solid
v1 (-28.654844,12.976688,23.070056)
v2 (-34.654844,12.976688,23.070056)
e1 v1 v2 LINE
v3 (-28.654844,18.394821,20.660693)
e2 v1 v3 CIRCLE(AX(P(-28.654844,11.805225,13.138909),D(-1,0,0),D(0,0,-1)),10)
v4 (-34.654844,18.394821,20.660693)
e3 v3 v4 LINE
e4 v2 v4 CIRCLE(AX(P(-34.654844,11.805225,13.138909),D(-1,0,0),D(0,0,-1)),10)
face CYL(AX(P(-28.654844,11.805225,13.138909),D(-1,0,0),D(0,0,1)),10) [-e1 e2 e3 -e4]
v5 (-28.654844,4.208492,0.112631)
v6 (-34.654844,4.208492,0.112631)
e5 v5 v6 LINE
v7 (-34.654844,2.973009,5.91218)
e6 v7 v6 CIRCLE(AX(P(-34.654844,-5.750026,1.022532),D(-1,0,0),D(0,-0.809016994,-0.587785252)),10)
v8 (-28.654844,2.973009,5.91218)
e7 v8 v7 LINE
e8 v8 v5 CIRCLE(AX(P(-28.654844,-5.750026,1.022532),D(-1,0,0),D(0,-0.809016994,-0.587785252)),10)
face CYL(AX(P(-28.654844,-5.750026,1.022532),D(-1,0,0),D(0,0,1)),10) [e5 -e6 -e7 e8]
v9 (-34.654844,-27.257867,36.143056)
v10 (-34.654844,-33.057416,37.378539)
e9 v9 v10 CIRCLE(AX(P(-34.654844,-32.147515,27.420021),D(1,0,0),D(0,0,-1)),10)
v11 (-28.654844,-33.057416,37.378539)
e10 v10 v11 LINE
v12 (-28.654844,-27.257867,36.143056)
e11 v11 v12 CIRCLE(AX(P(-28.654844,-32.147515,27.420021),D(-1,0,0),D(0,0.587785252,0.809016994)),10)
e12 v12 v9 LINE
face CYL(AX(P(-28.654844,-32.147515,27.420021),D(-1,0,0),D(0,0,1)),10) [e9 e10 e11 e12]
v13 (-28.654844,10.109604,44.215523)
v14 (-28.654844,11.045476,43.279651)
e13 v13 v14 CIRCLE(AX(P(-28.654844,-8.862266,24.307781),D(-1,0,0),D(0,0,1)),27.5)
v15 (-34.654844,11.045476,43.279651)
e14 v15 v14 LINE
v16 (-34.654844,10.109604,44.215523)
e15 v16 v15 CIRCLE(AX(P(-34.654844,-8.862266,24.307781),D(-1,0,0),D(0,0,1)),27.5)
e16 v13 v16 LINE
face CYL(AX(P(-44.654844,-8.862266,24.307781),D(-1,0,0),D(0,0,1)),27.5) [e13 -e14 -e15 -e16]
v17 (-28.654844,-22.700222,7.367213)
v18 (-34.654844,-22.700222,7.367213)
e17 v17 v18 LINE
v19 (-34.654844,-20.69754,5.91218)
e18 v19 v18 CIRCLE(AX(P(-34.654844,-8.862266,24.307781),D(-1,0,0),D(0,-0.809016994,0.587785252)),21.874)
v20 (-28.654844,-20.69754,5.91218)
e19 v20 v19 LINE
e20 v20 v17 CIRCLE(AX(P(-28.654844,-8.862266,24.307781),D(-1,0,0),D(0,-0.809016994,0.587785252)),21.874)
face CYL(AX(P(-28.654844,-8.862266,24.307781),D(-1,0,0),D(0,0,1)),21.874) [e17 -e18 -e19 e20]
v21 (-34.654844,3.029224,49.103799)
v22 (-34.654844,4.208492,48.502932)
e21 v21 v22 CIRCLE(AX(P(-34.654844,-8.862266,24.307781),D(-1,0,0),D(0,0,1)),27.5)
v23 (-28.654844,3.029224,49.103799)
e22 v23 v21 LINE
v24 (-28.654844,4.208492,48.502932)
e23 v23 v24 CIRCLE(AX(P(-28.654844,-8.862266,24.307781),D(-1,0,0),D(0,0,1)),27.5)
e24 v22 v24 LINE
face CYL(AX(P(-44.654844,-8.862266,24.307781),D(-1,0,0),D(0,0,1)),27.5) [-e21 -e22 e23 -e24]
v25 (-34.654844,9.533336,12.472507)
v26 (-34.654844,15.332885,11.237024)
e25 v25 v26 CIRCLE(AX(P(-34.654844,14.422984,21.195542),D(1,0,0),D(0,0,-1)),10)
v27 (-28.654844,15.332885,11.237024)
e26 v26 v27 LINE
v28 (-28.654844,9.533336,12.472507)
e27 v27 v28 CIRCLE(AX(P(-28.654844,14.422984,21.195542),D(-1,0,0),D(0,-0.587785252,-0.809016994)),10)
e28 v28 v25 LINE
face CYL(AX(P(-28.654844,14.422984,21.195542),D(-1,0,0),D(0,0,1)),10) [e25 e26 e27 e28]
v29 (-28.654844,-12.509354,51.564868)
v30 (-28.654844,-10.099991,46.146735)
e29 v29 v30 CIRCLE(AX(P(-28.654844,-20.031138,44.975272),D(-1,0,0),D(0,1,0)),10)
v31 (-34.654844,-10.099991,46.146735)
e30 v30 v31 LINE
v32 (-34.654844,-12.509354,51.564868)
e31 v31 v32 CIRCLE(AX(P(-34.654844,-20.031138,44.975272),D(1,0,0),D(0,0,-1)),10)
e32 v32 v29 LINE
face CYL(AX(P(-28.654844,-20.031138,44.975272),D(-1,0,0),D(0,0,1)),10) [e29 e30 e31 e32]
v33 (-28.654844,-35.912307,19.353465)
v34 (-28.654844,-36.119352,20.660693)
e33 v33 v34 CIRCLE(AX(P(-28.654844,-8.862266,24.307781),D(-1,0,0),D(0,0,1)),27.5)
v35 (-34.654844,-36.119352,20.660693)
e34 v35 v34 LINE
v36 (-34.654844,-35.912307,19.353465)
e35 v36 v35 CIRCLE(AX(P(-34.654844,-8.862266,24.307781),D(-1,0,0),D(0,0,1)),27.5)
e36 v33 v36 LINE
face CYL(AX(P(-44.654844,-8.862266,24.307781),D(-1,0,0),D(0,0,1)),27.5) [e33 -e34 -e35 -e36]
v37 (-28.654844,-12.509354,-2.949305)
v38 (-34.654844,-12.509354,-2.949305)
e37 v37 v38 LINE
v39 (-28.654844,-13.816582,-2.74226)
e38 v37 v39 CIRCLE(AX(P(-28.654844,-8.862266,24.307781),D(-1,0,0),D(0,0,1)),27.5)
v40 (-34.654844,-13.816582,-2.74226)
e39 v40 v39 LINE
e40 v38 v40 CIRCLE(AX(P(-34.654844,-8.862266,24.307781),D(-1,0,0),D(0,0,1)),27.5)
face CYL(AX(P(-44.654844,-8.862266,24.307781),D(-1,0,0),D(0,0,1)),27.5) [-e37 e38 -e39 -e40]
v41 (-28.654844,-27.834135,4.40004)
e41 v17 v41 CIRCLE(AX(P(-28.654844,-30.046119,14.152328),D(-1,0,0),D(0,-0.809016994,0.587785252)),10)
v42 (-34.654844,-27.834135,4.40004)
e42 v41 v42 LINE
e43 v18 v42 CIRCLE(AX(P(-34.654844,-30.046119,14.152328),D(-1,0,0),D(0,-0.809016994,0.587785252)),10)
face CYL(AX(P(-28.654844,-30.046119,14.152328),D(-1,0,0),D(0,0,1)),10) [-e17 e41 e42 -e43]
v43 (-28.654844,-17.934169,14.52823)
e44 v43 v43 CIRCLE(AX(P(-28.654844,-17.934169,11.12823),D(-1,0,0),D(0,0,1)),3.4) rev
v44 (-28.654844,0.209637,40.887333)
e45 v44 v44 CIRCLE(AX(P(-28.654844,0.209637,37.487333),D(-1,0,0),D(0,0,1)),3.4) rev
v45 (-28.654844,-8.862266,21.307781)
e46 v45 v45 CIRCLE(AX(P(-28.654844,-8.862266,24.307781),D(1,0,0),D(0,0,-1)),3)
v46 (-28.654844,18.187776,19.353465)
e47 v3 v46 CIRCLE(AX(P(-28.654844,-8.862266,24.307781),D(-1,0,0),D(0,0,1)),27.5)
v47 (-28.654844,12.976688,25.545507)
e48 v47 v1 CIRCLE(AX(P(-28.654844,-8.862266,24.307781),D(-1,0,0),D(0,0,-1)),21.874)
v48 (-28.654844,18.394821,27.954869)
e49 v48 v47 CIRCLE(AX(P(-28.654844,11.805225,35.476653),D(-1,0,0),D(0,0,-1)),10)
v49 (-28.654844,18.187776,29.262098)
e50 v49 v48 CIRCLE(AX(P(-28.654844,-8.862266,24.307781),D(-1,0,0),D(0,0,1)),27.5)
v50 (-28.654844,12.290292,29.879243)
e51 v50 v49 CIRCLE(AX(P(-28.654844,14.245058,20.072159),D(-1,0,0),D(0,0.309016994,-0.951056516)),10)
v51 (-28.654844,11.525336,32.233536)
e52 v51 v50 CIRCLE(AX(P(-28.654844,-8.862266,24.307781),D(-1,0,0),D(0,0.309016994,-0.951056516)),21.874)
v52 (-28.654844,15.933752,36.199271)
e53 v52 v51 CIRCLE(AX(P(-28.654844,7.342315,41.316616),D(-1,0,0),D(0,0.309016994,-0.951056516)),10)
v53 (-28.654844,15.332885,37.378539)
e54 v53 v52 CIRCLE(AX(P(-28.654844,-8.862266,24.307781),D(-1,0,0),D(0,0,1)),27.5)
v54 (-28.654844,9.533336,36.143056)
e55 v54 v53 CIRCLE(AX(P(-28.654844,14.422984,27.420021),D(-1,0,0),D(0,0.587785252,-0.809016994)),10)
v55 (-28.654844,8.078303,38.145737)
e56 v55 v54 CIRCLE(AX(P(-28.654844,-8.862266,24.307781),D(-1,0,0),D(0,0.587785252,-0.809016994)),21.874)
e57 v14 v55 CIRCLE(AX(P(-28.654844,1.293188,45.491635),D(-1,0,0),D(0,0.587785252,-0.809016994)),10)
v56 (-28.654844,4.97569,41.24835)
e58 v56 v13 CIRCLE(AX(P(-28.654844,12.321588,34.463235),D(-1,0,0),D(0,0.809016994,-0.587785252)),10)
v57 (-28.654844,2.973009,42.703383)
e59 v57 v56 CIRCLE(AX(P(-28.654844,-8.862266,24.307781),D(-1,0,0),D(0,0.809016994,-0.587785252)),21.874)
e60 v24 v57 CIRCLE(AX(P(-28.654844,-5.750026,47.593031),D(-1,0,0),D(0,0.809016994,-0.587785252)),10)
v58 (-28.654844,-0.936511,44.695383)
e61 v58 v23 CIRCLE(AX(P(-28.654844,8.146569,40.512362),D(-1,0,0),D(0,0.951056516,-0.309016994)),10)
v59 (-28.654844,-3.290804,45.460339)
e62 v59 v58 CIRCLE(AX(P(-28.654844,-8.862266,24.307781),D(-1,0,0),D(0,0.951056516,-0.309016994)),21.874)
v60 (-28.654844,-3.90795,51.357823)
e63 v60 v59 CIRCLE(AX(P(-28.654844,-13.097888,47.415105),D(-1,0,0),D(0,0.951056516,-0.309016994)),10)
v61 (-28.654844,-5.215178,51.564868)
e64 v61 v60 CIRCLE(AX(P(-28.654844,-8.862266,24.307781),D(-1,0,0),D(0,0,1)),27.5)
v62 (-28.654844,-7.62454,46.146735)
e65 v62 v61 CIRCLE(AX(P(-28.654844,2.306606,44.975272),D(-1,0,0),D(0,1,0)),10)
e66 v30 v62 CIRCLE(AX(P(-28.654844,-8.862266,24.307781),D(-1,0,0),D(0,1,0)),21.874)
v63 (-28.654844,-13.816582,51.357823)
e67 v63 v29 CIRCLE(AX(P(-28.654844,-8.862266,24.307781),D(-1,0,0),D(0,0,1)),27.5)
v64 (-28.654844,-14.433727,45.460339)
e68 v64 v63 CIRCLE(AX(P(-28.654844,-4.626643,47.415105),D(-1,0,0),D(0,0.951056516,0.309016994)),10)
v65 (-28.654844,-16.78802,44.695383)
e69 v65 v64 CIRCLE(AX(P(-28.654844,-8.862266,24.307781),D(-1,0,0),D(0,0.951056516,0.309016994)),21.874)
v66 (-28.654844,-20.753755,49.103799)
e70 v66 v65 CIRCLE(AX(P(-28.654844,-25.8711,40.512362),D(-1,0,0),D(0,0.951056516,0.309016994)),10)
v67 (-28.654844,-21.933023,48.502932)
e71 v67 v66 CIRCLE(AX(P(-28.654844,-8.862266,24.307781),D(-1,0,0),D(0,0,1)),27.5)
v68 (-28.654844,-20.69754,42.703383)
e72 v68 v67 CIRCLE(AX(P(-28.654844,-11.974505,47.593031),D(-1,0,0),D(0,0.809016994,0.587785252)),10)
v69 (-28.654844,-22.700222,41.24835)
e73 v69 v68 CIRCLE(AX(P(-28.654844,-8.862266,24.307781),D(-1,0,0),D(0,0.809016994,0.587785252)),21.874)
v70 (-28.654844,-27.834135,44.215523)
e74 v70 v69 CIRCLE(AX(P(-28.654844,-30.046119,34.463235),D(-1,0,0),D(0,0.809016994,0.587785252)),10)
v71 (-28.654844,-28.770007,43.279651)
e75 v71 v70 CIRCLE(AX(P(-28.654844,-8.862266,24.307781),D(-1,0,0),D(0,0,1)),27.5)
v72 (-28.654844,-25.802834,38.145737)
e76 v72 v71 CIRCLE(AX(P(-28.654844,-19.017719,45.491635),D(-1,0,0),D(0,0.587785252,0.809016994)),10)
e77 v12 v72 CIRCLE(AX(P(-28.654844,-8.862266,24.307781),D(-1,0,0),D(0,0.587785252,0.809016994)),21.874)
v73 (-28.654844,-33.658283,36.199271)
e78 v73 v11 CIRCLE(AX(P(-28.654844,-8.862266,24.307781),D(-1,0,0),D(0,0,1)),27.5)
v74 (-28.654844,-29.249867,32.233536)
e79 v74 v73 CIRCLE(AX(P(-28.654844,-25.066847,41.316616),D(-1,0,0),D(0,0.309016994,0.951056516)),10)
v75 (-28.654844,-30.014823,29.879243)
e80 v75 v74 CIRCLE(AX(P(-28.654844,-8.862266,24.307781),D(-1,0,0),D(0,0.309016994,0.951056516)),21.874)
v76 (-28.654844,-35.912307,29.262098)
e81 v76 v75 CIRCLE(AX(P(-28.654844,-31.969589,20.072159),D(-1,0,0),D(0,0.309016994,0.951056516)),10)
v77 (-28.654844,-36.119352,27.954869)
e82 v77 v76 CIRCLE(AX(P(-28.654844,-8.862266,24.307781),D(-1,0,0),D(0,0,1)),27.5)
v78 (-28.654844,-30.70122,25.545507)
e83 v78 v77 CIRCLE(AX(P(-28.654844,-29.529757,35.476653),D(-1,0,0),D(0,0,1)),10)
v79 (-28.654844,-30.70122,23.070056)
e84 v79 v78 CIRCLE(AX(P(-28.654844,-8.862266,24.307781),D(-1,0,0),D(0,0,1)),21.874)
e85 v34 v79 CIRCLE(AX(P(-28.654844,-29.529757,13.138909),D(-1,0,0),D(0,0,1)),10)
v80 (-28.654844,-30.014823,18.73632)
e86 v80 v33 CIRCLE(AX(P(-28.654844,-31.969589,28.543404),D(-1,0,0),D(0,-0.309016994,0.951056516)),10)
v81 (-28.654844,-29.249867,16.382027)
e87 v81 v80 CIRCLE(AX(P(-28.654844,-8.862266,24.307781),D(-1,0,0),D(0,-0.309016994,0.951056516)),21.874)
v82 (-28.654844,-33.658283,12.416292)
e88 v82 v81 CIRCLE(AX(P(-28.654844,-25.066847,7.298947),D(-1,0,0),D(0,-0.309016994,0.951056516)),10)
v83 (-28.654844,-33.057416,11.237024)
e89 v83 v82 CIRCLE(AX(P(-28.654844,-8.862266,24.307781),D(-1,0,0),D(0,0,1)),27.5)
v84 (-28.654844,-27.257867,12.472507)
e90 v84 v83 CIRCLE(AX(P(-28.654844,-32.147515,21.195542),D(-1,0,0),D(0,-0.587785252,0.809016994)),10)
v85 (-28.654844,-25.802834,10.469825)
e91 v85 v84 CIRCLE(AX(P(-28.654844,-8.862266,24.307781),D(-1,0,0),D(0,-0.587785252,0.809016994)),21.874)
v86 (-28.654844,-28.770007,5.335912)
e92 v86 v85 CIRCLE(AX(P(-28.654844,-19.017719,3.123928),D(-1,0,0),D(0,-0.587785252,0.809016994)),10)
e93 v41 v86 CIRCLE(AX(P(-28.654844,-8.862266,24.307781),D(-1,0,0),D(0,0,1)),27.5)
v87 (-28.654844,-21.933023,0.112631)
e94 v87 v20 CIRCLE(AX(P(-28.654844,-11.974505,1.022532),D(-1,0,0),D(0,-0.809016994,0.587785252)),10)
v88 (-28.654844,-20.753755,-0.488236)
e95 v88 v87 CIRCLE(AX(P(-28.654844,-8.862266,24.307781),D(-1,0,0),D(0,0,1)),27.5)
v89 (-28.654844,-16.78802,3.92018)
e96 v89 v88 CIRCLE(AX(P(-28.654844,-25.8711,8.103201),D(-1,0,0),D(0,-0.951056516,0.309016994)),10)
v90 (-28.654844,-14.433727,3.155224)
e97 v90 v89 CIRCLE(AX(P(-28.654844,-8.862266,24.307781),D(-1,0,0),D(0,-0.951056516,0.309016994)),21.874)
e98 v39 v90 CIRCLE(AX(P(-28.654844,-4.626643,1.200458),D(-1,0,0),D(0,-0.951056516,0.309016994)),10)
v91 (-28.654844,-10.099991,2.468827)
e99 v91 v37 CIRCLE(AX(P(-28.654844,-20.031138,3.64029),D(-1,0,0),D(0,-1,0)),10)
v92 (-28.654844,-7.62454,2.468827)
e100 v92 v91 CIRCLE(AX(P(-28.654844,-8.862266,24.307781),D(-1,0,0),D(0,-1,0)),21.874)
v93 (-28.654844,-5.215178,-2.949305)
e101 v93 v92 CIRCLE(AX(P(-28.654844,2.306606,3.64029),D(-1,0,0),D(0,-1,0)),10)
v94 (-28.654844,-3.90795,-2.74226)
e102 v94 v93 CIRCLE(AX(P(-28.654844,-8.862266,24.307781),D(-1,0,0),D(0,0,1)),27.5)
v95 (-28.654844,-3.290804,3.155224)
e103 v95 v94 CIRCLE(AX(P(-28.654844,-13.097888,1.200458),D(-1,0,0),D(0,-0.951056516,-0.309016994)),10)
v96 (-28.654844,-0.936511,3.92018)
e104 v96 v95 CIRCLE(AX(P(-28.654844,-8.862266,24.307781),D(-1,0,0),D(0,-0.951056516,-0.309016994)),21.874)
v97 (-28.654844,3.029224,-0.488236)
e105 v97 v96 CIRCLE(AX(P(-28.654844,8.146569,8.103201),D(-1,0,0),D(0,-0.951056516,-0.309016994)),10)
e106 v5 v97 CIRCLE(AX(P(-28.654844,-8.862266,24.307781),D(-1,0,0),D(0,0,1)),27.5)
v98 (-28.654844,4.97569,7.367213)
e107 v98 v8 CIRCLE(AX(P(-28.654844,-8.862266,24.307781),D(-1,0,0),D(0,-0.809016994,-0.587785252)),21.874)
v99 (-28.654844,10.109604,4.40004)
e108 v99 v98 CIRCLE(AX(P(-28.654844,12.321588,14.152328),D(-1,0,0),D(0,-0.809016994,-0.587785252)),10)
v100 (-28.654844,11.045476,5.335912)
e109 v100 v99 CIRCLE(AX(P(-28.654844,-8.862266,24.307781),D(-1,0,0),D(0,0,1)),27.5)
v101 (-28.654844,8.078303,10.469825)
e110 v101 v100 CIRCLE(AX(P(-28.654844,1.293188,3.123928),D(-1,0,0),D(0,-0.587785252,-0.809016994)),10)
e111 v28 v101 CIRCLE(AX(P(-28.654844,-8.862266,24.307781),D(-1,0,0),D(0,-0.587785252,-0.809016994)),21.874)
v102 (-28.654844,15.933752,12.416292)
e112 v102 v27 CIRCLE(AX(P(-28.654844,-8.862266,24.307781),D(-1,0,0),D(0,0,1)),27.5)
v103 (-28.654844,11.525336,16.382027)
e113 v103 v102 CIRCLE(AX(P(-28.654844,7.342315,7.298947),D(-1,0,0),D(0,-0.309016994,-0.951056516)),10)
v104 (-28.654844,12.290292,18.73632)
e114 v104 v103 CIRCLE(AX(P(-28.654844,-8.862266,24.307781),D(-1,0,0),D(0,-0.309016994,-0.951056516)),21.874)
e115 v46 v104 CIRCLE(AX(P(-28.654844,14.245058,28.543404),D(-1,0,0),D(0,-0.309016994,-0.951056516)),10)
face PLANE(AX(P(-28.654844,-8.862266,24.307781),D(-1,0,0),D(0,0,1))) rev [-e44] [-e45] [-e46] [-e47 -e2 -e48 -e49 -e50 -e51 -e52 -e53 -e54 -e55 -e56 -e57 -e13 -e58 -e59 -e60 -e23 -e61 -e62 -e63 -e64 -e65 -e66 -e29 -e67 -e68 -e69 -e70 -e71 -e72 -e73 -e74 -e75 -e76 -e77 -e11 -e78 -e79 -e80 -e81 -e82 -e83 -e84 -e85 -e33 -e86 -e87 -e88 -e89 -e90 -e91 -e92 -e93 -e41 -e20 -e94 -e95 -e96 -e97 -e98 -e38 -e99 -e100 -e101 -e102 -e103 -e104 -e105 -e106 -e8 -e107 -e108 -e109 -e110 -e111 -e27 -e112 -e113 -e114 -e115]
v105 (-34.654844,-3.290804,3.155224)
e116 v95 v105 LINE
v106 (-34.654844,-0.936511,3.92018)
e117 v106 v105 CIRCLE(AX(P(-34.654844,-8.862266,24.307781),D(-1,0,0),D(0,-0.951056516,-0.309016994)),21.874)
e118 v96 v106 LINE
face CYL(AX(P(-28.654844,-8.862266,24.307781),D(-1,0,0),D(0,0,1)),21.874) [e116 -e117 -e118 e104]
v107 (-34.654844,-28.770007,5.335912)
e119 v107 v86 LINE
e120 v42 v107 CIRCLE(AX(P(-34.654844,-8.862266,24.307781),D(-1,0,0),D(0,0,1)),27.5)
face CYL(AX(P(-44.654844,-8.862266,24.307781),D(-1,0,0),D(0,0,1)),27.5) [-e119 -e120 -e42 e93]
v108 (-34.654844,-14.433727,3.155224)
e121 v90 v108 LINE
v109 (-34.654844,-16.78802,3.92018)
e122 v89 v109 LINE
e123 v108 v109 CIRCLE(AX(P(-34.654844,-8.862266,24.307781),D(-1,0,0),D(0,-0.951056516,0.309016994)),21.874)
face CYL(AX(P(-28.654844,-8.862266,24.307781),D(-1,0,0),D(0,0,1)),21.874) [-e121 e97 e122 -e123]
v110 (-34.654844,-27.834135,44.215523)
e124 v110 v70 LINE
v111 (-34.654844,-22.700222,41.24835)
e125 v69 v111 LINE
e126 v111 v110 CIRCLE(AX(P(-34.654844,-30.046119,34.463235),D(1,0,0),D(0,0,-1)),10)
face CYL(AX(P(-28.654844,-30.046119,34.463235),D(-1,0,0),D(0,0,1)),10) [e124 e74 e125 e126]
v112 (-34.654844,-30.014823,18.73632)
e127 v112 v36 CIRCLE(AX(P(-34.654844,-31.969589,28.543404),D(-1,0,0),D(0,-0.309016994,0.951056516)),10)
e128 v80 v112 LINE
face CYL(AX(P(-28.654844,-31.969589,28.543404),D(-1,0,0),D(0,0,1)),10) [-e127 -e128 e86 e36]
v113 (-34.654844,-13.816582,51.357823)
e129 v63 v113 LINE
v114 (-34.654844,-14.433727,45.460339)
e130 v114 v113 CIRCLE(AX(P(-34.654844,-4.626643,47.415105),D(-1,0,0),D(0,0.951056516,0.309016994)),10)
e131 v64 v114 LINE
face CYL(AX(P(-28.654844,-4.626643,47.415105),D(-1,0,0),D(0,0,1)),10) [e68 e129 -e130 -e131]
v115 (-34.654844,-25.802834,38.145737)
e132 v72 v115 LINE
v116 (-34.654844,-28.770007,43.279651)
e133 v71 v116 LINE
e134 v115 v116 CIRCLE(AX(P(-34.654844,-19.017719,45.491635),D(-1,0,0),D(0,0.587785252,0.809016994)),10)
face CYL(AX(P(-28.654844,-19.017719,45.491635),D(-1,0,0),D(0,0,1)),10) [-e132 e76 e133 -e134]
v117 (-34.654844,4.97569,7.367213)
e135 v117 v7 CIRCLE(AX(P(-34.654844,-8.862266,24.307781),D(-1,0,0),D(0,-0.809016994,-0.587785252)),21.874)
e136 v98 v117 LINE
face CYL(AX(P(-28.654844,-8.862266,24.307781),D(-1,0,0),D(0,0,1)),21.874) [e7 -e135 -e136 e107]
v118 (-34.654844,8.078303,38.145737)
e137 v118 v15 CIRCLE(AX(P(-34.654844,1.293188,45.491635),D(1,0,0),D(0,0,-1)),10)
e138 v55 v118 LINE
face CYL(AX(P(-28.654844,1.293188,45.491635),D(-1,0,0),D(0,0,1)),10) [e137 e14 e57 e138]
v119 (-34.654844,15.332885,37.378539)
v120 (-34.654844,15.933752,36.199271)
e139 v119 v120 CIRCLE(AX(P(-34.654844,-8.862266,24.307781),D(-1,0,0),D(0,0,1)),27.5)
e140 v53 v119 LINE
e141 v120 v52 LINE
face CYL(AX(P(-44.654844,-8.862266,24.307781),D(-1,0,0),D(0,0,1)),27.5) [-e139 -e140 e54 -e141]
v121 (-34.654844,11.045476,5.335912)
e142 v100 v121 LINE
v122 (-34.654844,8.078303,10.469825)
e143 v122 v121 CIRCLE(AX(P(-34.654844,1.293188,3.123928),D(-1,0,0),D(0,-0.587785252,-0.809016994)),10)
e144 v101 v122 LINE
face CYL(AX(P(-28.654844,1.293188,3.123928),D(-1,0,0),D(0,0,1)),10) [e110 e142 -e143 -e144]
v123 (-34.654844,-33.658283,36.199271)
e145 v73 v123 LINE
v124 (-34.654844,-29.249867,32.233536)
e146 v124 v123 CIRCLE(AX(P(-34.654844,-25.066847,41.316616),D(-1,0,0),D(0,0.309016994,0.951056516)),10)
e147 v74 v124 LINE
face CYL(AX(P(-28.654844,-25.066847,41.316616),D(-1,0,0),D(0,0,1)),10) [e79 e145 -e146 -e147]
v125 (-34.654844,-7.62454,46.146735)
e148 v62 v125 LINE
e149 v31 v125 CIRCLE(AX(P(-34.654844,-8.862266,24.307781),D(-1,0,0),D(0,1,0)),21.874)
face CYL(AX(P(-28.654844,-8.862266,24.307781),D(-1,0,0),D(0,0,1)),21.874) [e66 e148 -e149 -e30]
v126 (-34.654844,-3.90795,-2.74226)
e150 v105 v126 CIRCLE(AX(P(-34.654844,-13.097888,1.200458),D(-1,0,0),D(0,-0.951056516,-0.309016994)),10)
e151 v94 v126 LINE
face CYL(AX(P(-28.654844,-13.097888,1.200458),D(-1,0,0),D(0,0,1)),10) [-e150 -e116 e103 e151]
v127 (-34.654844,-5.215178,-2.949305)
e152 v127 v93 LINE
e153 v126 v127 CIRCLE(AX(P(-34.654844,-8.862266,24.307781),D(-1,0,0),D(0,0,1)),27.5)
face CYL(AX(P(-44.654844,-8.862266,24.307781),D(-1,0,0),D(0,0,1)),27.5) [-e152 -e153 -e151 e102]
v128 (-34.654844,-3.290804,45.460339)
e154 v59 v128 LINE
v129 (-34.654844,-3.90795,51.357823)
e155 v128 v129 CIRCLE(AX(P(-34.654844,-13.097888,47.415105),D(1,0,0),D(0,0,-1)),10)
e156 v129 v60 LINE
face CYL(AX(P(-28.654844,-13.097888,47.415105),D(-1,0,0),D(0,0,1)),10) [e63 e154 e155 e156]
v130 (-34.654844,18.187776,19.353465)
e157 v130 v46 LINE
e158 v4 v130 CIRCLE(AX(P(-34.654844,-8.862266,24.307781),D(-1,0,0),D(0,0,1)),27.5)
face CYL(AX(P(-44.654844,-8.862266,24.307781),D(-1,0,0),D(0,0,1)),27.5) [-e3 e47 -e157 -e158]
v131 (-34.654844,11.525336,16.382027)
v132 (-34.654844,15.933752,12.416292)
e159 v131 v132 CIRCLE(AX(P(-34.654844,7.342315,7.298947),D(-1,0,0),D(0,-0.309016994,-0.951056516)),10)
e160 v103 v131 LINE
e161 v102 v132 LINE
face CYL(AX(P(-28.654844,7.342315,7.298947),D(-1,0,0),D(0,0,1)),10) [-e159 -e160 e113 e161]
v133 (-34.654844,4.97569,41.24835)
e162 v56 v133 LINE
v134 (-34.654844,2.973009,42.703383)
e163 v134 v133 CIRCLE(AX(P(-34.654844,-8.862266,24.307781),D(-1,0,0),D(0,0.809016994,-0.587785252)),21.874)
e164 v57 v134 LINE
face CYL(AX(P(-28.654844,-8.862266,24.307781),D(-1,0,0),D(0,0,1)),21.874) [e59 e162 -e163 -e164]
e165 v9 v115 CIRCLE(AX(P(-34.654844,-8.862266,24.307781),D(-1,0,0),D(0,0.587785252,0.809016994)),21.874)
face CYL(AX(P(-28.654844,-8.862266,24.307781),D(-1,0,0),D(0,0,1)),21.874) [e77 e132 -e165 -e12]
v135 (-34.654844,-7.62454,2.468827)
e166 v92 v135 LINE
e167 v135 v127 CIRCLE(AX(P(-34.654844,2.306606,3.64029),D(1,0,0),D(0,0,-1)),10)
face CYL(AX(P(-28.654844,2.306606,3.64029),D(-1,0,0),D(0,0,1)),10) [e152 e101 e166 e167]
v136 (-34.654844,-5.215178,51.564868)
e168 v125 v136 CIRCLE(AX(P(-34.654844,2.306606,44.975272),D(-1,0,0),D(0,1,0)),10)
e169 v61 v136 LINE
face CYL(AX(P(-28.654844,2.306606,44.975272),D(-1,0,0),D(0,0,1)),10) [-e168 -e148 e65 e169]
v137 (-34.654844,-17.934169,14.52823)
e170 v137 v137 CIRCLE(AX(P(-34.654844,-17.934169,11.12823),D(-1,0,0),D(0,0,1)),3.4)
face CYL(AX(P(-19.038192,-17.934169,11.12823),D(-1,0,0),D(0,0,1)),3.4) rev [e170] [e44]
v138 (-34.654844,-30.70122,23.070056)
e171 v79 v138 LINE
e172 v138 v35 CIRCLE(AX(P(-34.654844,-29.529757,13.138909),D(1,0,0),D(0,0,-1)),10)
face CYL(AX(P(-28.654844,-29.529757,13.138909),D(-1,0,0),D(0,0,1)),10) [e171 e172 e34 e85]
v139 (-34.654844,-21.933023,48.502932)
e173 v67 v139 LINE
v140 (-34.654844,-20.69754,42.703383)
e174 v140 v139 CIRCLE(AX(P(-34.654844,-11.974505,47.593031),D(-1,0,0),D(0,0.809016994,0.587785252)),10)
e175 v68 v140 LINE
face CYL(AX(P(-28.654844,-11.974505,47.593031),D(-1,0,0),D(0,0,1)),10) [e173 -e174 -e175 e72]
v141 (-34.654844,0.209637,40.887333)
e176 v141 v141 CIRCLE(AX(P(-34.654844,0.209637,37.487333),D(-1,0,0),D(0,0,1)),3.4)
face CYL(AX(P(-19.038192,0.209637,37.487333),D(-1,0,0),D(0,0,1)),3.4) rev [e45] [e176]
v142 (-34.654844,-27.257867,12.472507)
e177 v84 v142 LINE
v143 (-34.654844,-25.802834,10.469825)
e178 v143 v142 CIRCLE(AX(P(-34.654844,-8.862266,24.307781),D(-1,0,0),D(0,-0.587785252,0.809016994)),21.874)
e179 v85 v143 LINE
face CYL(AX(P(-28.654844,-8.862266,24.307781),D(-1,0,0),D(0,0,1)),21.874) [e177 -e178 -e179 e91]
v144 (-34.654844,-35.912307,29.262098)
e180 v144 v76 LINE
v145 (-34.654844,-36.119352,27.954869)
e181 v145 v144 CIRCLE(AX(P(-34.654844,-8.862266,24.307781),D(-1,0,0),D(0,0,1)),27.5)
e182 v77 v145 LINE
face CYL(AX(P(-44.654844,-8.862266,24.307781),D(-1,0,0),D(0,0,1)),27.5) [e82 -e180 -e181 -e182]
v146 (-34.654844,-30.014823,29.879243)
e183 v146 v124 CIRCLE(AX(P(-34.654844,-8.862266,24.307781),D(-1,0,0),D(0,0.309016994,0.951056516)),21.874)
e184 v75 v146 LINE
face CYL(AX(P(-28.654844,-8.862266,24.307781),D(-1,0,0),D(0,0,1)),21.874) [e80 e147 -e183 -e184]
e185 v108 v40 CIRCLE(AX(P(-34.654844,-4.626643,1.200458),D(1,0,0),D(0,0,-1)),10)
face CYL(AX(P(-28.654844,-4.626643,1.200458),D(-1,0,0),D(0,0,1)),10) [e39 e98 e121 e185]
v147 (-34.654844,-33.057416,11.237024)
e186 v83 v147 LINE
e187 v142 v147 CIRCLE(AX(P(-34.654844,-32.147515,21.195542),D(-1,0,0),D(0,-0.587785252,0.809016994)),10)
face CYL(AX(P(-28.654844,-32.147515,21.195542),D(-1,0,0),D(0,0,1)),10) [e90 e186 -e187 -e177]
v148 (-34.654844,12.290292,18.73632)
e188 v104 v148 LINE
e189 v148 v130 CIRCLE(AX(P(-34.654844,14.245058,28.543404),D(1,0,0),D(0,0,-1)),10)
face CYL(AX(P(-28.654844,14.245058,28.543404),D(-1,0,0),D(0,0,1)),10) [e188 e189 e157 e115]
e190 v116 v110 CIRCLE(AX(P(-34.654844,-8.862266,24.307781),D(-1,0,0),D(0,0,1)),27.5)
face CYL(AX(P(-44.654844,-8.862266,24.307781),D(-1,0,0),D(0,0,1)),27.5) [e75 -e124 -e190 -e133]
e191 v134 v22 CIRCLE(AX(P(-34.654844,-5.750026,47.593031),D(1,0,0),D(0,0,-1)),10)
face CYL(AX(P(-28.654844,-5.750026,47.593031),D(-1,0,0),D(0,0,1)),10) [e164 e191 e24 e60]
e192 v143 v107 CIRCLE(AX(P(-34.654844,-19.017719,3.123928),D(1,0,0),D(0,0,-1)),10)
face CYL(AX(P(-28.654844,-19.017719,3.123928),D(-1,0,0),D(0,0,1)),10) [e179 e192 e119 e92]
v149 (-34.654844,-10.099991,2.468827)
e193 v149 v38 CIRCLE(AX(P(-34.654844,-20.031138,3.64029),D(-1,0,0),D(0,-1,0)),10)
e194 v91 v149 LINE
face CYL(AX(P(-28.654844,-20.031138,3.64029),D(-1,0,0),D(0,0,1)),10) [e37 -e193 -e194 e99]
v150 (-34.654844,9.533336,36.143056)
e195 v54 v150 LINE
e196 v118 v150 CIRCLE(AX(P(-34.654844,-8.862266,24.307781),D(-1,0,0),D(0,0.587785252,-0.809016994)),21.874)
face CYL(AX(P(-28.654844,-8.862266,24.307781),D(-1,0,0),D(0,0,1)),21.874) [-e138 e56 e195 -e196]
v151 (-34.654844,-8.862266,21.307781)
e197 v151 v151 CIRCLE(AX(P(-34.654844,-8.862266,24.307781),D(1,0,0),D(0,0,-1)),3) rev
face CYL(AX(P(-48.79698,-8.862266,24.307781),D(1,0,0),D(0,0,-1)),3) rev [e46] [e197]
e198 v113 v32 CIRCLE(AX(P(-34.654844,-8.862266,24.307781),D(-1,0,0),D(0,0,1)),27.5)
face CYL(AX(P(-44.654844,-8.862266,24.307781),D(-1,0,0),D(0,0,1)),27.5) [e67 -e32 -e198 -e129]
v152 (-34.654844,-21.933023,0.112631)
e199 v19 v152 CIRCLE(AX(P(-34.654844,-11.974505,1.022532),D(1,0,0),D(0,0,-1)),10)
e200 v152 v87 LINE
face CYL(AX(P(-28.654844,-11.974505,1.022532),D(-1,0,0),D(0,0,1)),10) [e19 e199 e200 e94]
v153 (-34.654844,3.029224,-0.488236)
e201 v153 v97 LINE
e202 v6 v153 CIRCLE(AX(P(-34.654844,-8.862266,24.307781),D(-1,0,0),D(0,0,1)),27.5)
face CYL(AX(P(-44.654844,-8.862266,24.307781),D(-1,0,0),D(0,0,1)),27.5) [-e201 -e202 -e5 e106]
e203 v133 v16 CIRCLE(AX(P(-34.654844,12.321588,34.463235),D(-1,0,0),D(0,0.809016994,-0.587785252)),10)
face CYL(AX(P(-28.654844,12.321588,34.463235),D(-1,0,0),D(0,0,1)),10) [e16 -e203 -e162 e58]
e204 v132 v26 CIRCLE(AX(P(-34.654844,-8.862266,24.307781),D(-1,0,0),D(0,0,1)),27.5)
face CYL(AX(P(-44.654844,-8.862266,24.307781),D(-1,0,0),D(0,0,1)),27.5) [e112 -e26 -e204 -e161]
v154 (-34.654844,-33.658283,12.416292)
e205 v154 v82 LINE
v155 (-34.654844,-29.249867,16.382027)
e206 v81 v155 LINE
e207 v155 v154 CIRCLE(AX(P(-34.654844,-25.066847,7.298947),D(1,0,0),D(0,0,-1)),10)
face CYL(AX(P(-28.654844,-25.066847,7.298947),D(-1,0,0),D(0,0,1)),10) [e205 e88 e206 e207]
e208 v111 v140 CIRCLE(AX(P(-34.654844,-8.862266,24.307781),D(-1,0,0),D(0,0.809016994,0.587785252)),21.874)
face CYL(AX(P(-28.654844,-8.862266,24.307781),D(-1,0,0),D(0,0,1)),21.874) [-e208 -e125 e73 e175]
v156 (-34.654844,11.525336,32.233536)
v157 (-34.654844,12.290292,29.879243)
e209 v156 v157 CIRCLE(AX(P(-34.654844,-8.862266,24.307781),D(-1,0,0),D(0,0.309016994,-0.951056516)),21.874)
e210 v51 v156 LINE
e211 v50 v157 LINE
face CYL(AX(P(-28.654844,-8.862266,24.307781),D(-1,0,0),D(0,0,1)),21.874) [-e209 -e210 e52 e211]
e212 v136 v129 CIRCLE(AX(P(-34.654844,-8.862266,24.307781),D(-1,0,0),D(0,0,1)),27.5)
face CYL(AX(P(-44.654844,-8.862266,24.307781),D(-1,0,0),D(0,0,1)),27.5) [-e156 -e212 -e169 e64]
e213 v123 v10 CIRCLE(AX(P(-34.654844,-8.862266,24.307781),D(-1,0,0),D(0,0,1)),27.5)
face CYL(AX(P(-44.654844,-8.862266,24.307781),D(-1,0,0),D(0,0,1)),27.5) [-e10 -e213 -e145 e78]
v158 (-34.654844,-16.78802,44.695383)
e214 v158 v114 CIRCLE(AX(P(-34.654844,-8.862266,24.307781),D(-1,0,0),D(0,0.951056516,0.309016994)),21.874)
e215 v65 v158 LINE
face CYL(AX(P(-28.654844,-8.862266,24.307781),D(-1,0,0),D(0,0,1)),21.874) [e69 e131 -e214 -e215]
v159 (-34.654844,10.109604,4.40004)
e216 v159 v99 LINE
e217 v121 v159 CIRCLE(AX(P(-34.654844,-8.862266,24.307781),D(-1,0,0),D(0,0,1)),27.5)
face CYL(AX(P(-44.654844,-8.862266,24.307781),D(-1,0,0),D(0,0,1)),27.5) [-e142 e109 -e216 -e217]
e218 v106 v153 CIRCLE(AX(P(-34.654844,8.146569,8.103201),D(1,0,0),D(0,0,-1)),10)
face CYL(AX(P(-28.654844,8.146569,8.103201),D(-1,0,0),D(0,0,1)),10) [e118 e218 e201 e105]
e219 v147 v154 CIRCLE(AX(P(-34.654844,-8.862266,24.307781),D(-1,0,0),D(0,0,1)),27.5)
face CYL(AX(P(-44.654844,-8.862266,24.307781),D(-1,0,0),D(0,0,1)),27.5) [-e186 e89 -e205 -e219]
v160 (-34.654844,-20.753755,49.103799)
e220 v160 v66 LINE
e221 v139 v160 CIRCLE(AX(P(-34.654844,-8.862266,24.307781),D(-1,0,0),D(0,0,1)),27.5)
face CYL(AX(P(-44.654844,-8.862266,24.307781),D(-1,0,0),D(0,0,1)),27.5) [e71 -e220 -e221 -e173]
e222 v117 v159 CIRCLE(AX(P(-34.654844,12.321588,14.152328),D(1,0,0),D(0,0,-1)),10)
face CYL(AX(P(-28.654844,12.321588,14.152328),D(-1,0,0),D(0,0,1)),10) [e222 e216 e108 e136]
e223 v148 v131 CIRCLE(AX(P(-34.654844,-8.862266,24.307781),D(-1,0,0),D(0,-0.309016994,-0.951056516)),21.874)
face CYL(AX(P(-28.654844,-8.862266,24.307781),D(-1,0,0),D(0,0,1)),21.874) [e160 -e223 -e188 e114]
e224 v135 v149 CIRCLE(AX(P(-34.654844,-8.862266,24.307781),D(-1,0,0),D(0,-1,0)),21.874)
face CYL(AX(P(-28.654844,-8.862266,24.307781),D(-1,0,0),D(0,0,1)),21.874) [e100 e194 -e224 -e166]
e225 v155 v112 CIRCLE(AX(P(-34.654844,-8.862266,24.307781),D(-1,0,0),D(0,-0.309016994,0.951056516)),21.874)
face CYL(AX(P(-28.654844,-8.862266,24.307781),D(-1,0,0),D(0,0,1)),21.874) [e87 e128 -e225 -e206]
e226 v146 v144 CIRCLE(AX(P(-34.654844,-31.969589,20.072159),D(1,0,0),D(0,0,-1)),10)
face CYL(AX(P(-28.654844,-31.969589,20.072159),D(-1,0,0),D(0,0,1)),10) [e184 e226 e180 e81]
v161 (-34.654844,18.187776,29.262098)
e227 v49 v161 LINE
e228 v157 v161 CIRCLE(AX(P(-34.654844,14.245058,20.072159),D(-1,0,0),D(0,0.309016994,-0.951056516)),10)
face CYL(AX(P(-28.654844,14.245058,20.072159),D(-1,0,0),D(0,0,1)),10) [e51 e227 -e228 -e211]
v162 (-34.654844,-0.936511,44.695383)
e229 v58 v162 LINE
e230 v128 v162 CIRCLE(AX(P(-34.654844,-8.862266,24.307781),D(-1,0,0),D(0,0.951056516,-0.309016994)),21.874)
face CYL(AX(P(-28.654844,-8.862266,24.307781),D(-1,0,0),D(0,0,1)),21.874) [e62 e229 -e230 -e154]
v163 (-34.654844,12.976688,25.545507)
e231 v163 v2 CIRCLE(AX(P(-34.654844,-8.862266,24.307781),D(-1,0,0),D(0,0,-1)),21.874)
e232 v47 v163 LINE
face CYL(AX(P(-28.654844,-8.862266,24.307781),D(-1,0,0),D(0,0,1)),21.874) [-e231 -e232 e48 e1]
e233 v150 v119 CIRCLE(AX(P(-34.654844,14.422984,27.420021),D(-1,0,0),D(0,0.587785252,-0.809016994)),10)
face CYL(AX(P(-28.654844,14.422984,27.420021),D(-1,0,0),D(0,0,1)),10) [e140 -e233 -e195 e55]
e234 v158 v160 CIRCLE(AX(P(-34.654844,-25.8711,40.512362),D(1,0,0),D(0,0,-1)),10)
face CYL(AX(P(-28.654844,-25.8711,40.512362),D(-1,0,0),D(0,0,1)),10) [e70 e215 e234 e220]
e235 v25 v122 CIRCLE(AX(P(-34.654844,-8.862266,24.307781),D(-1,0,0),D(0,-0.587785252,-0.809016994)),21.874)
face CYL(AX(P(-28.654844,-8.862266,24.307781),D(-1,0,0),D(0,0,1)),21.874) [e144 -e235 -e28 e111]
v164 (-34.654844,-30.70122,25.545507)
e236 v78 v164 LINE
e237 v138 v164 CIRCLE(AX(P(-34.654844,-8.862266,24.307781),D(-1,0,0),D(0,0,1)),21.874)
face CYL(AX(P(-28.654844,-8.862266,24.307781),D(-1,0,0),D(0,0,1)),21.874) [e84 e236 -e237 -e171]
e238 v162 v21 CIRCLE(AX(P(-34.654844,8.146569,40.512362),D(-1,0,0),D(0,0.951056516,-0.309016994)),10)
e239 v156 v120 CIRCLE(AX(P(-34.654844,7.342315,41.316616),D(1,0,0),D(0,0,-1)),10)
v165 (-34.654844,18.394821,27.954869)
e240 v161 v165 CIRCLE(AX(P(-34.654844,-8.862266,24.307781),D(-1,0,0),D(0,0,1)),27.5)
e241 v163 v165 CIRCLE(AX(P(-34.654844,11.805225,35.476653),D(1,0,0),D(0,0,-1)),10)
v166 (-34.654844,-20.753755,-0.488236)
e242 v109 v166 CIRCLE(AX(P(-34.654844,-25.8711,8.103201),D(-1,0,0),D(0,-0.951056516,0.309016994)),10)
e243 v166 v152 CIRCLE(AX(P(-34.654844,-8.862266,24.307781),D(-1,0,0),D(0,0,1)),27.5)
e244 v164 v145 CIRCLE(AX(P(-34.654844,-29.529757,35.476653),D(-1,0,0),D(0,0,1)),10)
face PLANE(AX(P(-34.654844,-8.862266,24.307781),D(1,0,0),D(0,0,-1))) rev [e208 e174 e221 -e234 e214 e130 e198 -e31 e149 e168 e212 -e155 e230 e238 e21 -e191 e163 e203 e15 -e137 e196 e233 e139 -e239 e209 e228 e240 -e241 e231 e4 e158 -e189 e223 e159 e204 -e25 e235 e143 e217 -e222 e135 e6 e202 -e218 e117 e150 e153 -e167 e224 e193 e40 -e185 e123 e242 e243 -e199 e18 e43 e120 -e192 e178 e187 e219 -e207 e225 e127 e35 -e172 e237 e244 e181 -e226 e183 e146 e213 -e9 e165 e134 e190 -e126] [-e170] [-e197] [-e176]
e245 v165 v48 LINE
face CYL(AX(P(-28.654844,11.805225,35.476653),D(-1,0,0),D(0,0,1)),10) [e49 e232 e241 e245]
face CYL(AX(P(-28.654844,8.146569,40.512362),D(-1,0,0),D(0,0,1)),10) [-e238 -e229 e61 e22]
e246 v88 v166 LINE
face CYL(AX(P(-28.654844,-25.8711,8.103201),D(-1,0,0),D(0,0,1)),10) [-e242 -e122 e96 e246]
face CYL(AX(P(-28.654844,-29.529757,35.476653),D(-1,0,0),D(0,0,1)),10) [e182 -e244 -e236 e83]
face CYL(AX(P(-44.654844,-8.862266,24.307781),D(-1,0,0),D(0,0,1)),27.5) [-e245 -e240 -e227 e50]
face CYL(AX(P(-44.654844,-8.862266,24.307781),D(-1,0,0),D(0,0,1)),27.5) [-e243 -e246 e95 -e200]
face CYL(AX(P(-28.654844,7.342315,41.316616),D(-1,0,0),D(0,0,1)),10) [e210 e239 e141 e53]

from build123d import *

# Parameters (mm, degrees)
SPUR_START             = -34.654843931
SPUR_GEAR_AM_OUTLINE_R = 5
SPUR_GEAR_AM_DEPTH     = 6
BOSS_EXTRUDE1_START    = -6
SKETCH2_R              = 5
SKETCH2_R_2            = 3
BOSS_EXTRUDE1_DEPTH    = 6
CUT_EXTRUDE1_REACH     = 65.242
SKETCH3_R              = 3.4


# Read off the part's stored shape, not the designer's step: spur gear_am
with BuildPart() as part:
    # spur gear_am outline → spur gear_am (new body)
    with BuildSketch(Plane.YZ.offset(SPUR_START)):
        with BuildLine():
            ThreePointArc((-3.907949552, 51.357822977), (-4.560317936, 51.46921073), (-5.215177847, 51.564867598))
            ThreePointArc((-5.215177847, 51.564867598), (-6.830693003, 49.038493172), (-7.624540457, 46.146735372))
            ThreePointArc((-7.624540457, 46.146735372), (-8.862265725, 46.181781364), (-10.099990992, 46.146735372))
            ThreePointArc((-10.099990992, 46.146735372), (-10.893838446, 49.038493172), (-12.509353602, 51.564867598))
            ThreePointArc((-12.509353602, 51.564867598), (-13.164213513, 51.46921073), (-13.816581897, 51.357822977))
            ThreePointArc((-13.816581897, 51.357822977), (-14.572335481, 48.455876478), (-14.433726972, 45.460339024))
            ThreePointArc((-14.433726972, 45.460339024), (-15.62170346, 45.111191601), (-16.788020333, 44.69538274))
            ThreePointArc((-16.788020333, 44.69538274), (-18.436616432, 47.200295486), (-20.75375528, 49.103798708))
            ThreePointArc((-20.75375528, 49.103798708), (-21.347004468, 48.810460779), (-21.933022961, 48.502931813))
            ThreePointArc((-21.933022961, 48.502931813), (-21.755036547, 45.509475985), (-20.69754004, 42.703382954))
            ThreePointArc((-20.69754004, 42.703382954), (-21.719480333, 42.004219099), (-22.700221591, 41.248349637))
            ThreePointArc((-22.700221591, 41.248349637), (-25.042190262, 43.121219015), (-27.834135107, 44.215522876))
            ThreePointArc((-27.834135107, 44.215522876), (-28.307702207, 43.753217846), (-28.770007237, 43.279650746))
            ThreePointArc((-28.770007237, 43.279650746), (-27.675703376, 40.487705901), (-25.802833998, 38.145737231))
            ThreePointArc((-25.802833998, 38.145737231), (-26.558703459, 37.164995972), (-27.257867315, 36.143055679))
            ThreePointArc((-27.257867315, 36.143055679), (-30.063960346, 37.200552186), (-33.057416174, 37.3785386))
            ThreePointArc((-33.057416174, 37.3785386), (-33.36494514, 36.792520107), (-33.658283069, 36.199270919))
            ThreePointArc((-33.658283069, 36.199270919), (-31.754779846, 33.882132071), (-29.249867101, 32.233535972))
            ThreePointArc((-29.249867101, 32.233535972), (-29.665675962, 31.067219099), (-30.014823385, 29.879242611))
            ThreePointArc((-30.014823385, 29.879242611), (-33.010360839, 30.01785112), (-35.912307338, 29.262097536))
            ThreePointArc((-35.912307338, 29.262097536), (-36.023695091, 28.609729152), (-36.119351959, 27.954869241))
            ThreePointArc((-36.119351959, 27.954869241), (-33.592977533, 26.339354085), (-30.701219732, 25.545506631))
            ThreePointArc((-30.701219732, 25.545506631), (-30.736265724, 24.307781363), (-30.701219732, 23.070056096))
            ThreePointArc((-30.701219732, 23.070056096), (-33.592977533, 22.276208642), (-36.119351959, 20.660693486))
            ThreePointArc((-36.119351959, 20.660693486), (-36.023695091, 20.005833575), (-35.912307338, 19.353465191))
            ThreePointArc((-35.912307338, 19.353465191), (-33.010360839, 18.597711607), (-30.014823385, 18.736320117))
            ThreePointArc((-30.014823385, 18.736320117), (-29.665675962, 17.548343629), (-29.249867101, 16.382026755))
            ThreePointArc((-29.249867101, 16.382026755), (-31.754779846, 14.733430656), (-33.658283069, 12.416291808))
            ThreePointArc((-33.658283069, 12.416291808), (-33.36494514, 11.82304262), (-33.057416174, 11.237024127))
            ThreePointArc((-33.057416174, 11.237024127), (-30.063960346, 11.415010541), (-27.257867315, 12.472507048))
            ThreePointArc((-27.257867315, 12.472507048), (-26.558703459, 11.450566755), (-25.802833998, 10.469825497))
            ThreePointArc((-25.802833998, 10.469825497), (-27.675703376, 8.127856826), (-28.770007237, 5.335911981))
            ThreePointArc((-28.770007237, 5.335911981), (-28.307702207, 4.862344881), (-27.834135107, 4.400039851))
            ThreePointArc((-27.834135107, 4.400039851), (-25.042190262, 5.494343712), (-22.700221591, 7.36721309))
            ThreePointArc((-22.700221591, 7.36721309), (-21.719480333, 6.611343629), (-20.69754004, 5.912179773))
            ThreePointArc((-20.69754004, 5.912179773), (-21.755036547, 3.106086742), (-21.933022961, 0.112630914))
            ThreePointArc((-21.933022961, 0.112630914), (-21.347004468, -0.194898052), (-20.75375528, -0.488235981))
            ThreePointArc((-20.75375528, -0.488235981), (-18.436616432, 1.415267242), (-16.788020333, 3.920179987))
            ThreePointArc((-16.788020333, 3.920179987), (-15.62170346, 3.504371126), (-14.433726972, 3.155223703))
            ThreePointArc((-14.433726972, 3.155223703), (-14.572335481, 0.159686249), (-13.816581897, -2.742260249))
            ThreePointArc((-13.816581897, -2.742260249), (-13.164213513, -2.853648003), (-12.509353602, -2.949304871))
            ThreePointArc((-12.509353602, -2.949304871), (-10.893838446, -0.422930445), (-10.099990992, 2.468827356))
            ThreePointArc((-10.099990992, 2.468827356), (-8.862265725, 2.433781364), (-7.624540457, 2.468827356))
            ThreePointArc((-7.624540457, 2.468827356), (-6.830693003, -0.422930445), (-5.215177847, -2.949304871))
            ThreePointArc((-5.215177847, -2.949304871), (-4.560317936, -2.853648003), (-3.907949552, -2.742260249))
            ThreePointArc((-3.907949552, -2.742260249), (-3.152195968, 0.159686249), (-3.290804477, 3.155223703))
            ThreePointArc((-3.290804477, 3.155223703), (-2.102827989, 3.504371126), (-0.936511116, 3.920179987))
            ThreePointArc((-0.936511116, 3.920179987), (0.712084983, 1.415267242), (3.029223831, -0.488235981))
            ThreePointArc((3.029223831, -0.488235981), (3.622473019, -0.194898052), (4.208491512, 0.112630914))
            ThreePointArc((4.208491512, 0.112630914), (4.030505098, 3.106086742), (2.973008591, 5.912179773))
            ThreePointArc((2.973008591, 5.912179773), (3.994948884, 6.611343629), (4.975690142, 7.36721309))
            ThreePointArc((4.975690142, 7.36721309), (7.317658813, 5.494343712), (10.109603658, 4.400039851))
            ThreePointArc((10.109603658, 4.400039851), (10.583170758, 4.862344881), (11.045475788, 5.335911981))
            ThreePointArc((11.045475788, 5.335911981), (9.951171927, 8.127856826), (8.078302549, 10.469825497))
            ThreePointArc((8.078302549, 10.469825497), (8.83417201, 11.450566755), (9.533335866, 12.472507048))
            ThreePointArc((9.533335866, 12.472507048), (12.339428897, 11.415010541), (15.332884725, 11.237024127))
            ThreePointArc((15.332884725, 11.237024127), (15.640413691, 11.82304262), (15.93375162, 12.416291808))
            ThreePointArc((15.93375162, 12.416291808), (14.030248397, 14.733430656), (11.525335652, 16.382026755))
            ThreePointArc((11.525335652, 16.382026755), (11.941144513, 17.548343629), (12.290291936, 18.736320117))
            ThreePointArc((12.290291936, 18.736320117), (15.28582939, 18.597711607), (18.187775889, 19.353465191))
            ThreePointArc((18.187775889, 19.353465191), (18.299163642, 20.005833575), (18.39482051, 20.660693486))
            ThreePointArc((18.39482051, 20.660693486), (15.868446084, 22.276208642), (12.976688283, 23.070056096))
            ThreePointArc((12.976688283, 23.070056096), (13.011734276, 24.307781363), (12.976688283, 25.545506631))
            ThreePointArc((12.976688283, 25.545506631), (15.868446084, 26.339354085), (18.39482051, 27.954869241))
            ThreePointArc((18.39482051, 27.954869241), (18.299163642, 28.609729152), (18.187775889, 29.262097536))
            ThreePointArc((18.187775889, 29.262097536), (15.28582939, 30.01785112), (12.290291936, 29.879242611))
            ThreePointArc((12.290291936, 29.879242611), (11.941144513, 31.067219099), (11.525335652, 32.233535972))
            ThreePointArc((11.525335652, 32.233535972), (14.030248397, 33.882132071), (15.93375162, 36.199270919))
            ThreePointArc((15.93375162, 36.199270919), (15.640413691, 36.792520107), (15.332884725, 37.3785386))
            ThreePointArc((15.332884725, 37.3785386), (12.339428897, 37.200552186), (9.533335866, 36.143055679))
            ThreePointArc((9.533335866, 36.143055679), (8.83417201, 37.164995972), (8.078302549, 38.145737231))
            ThreePointArc((8.078302549, 38.145737231), (9.951171927, 40.487705901), (11.045475788, 43.279650746))
            ThreePointArc((11.045475788, 43.279650746), (10.583170758, 43.753217846), (10.109603658, 44.215522876))
            ThreePointArc((10.109603658, 44.215522876), (7.317658813, 43.121219015), (4.975690142, 41.248349637))
            ThreePointArc((4.975690142, 41.248349637), (3.994948884, 42.004219099), (2.973008591, 42.703382954))
            ThreePointArc((2.973008591, 42.703382954), (4.030505098, 45.509475985), (4.208491512, 48.502931813))
            ThreePointArc((4.208491512, 48.502931813), (3.622473019, 48.810460779), (3.029223831, 49.103798708))
            ThreePointArc((3.029223831, 49.103798708), (0.712084983, 47.200295486), (-0.936511116, 44.69538274))
            ThreePointArc((-0.936511116, 44.69538274), (-2.102827989, 45.111191601), (-3.290804477, 45.460339024))
            ThreePointArc((-3.290804477, 45.460339024), (-3.152195968, 48.455876478), (-3.907949552, 51.357822977))
        make_face()
        with Locations((-8.862265724, 24.307781364)):
            Circle(SPUR_GEAR_AM_OUTLINE_R, mode=Mode.SUBTRACT)
    extrude(amount=SPUR_GEAR_AM_DEPTH)

    # Sketch2 → Boss-Extrude1 (add)
    with BuildSketch(Plane(origin=(-28.654843931, 0, 0), x_dir=(0, 0, -1), z_dir=(1, 0, 0)).offset(BOSS_EXTRUDE1_START)):
        with Locations((-24.307781364, -8.862265724)):
            Circle(SKETCH2_R)
        with Locations((-24.307781364, -8.862265724)):
            Circle(SKETCH2_R_2, mode=Mode.SUBTRACT)
    extrude(amount=BOSS_EXTRUDE1_DEPTH)

    # Sketch3 → Cut-Extrude1 (cut, up to next)
    with BuildSketch(Plane.ZY.offset(34.654843931), mode=Mode.PRIVATE) as cut_extrude1_sk1:
        with Locations((37.487332659, 0.209637475)):
            Circle(SKETCH3_R)
    cut_extrude1_tool1 = extrude(cut_extrude1_sk1.sketch, amount=-CUT_EXTRUDE1_REACH, mode=Mode.PRIVATE) & part.part
    # Sketch3 → Cut-Extrude1 (cut, up to next)
    with BuildSketch(Plane.ZY.offset(34.654843931), mode=Mode.PRIVATE) as cut_extrude1_sk2:
        with Locations((11.128230068, -17.934168924)):
            Circle(SKETCH3_R)
    cut_extrude1_tool2 = extrude(cut_extrude1_sk2.sketch, amount=-CUT_EXTRUDE1_REACH, mode=Mode.PRIVATE) & part.part
    add(cut_extrude1_tool1.solids().sort_by_distance((-34.654844, 0.209637, 37.487333))[0], mode=Mode.SUBTRACT)
    add(cut_extrude1_tool2.solids().sort_by_distance((-34.654844, -17.934169, 11.12823))[0], mode=Mode.SUBTRACT)


solid = part.part
